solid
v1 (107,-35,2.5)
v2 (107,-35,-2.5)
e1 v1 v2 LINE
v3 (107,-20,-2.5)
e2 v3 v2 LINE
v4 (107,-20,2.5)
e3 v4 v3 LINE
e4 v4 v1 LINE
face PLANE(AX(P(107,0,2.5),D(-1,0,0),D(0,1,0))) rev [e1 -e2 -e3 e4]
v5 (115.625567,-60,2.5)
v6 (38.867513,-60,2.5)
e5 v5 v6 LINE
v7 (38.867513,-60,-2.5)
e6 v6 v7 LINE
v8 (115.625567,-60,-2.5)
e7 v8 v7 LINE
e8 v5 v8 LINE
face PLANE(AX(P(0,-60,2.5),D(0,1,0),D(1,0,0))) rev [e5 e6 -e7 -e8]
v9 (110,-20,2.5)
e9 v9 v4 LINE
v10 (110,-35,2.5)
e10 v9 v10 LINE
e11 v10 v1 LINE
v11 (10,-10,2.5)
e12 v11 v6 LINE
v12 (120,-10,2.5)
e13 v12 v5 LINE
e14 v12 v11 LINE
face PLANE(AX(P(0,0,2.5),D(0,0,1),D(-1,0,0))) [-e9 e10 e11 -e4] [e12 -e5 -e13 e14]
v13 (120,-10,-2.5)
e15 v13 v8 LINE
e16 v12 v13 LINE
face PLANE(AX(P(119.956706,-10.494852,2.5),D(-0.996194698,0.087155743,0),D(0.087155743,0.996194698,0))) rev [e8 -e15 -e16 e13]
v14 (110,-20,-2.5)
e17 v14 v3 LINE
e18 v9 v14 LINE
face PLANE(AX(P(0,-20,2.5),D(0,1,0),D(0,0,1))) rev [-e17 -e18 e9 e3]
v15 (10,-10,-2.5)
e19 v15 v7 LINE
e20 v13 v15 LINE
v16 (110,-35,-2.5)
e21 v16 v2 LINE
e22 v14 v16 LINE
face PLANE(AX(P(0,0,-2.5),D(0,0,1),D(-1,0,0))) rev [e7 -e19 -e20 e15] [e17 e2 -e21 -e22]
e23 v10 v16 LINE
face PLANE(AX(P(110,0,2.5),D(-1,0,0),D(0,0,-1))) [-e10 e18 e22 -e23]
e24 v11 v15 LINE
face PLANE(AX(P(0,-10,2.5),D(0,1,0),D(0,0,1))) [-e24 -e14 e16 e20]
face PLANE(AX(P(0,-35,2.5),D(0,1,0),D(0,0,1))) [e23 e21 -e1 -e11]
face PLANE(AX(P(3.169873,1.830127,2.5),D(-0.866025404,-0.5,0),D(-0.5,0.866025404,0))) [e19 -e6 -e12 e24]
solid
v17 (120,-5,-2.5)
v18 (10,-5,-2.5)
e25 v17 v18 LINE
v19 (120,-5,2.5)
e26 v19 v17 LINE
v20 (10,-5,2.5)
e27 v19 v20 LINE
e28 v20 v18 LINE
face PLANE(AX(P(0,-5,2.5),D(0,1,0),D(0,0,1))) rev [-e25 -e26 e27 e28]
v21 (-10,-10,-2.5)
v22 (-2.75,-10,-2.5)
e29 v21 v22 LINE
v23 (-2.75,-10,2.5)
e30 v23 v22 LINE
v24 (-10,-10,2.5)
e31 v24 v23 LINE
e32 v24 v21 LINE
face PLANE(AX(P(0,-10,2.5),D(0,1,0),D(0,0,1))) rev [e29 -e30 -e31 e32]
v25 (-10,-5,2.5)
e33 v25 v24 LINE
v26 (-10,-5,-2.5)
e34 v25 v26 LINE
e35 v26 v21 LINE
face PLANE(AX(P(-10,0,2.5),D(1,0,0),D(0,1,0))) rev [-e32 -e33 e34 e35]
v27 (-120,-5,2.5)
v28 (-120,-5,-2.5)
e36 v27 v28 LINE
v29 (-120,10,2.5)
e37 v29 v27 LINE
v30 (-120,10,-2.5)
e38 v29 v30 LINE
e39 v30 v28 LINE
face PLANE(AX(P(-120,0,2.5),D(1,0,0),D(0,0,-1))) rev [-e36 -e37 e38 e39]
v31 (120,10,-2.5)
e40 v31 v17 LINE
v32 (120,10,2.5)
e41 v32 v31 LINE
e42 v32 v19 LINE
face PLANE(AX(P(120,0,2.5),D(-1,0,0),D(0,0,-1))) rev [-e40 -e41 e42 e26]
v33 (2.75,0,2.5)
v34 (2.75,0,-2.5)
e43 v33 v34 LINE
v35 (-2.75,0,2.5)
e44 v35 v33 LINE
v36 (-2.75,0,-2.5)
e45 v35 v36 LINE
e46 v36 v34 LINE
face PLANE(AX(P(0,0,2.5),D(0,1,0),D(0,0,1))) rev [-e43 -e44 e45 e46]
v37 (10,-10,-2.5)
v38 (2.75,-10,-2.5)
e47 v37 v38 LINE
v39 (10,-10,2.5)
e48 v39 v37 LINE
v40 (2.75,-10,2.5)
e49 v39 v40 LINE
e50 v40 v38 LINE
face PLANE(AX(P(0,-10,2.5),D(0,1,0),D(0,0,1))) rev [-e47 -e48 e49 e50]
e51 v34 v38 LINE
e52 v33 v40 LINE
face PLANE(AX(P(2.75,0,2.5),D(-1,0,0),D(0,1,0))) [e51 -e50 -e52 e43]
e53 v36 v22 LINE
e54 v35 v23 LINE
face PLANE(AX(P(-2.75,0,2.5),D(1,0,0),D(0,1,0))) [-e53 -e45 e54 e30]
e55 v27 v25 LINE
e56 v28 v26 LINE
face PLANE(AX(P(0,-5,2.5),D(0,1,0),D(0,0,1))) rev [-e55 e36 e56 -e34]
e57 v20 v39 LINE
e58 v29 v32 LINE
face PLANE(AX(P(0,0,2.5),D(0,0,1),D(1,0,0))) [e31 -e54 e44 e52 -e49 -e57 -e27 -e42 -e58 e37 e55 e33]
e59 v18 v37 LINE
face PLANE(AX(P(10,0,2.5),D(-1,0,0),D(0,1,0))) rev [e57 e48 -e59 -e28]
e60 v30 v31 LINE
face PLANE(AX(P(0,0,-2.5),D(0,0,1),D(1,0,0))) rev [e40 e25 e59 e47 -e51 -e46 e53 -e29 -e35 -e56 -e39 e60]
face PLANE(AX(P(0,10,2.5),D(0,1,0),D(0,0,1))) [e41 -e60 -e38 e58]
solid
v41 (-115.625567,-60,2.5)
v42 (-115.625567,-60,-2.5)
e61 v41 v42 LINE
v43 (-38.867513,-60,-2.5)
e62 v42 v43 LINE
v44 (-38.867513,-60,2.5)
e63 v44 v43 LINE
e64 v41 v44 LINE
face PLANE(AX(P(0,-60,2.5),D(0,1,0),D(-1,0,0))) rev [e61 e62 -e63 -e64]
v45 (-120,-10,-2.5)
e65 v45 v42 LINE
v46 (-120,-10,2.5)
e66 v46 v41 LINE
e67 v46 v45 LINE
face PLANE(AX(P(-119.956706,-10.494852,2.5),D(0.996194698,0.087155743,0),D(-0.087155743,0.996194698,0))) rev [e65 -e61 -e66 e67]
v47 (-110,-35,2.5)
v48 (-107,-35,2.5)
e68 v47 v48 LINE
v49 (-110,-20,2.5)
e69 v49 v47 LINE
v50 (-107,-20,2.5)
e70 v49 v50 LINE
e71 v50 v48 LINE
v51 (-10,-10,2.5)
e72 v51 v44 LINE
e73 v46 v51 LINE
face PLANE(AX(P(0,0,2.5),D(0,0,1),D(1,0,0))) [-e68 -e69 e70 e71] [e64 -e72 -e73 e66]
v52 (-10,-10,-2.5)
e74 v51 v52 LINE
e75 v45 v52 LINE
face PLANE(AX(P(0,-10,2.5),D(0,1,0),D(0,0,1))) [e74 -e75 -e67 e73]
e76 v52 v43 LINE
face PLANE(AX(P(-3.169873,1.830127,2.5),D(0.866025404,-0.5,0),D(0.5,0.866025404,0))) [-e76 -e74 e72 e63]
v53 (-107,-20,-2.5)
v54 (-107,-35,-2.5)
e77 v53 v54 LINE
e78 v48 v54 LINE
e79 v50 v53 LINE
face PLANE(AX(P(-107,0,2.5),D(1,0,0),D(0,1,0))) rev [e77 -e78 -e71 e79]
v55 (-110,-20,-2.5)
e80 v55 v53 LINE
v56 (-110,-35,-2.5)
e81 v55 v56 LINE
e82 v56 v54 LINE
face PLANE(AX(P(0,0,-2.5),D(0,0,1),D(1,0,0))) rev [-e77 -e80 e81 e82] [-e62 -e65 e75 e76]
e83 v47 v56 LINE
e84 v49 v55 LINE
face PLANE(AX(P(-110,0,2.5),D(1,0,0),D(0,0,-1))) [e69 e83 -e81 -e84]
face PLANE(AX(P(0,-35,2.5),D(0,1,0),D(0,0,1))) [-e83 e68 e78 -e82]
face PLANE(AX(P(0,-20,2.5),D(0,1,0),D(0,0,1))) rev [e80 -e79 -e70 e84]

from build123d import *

# Parameters (mm, degrees)
SKETCH1_W             = 3
SKETCH1_H             = 15
BOSS_EXTRUDE2_DEPTH   = 2.5
BOSS_EXTRUDE2_2_DEPTH = 2.5
MIRROR1_START         = -5
MIRROR1_OUTLINE_W     = 117.25
MIRROR1_OUTLINE_H     = 5
MIRROR1_DEPTH         = 15
MIRROR1_START_2       = -10
MIRROR1_2_OUTLINE_W   = 7.25
MIRROR1_2_OUTLINE_H   = 5
MIRROR1_2_DEPTH       = 5
MIRROR1_3_OUTLINE_W   = 2.75
MIRROR1_3_OUTLINE_H   = 5
MIRROR1_3_DEPTH       = 10


# Read off the part's stored shape, not the designer's step: Mirror1
with BuildPart() as part:
    # Sketch1 → Boss-Extrude2 (new, symmetric)
    with BuildSketch(Plane.XY):
        Polygon((-10, -10), (-120, -10), (-115.625566824, -60), (-38.867513459, -60), align=None)
        with Locations((-108.5, -27.5)):
            Rectangle(SKETCH1_W, SKETCH1_H, mode=Mode.SUBTRACT)
    extrude(amount=BOSS_EXTRUDE2_DEPTH, both=True)


with BuildPart() as body_2:
    # Sketch1 → Boss-Extrude2 2 (new, symmetric)
    with BuildSketch(Plane.XY):
        Polygon((-120, 10), (-120, -5), (-10, -5), (-10, -10), (-2.75, -10), (-2.75, 0), (0, 0), (0, 10), align=None)
    extrude(amount=BOSS_EXTRUDE2_2_DEPTH, both=True)



with BuildPart() as body_3:
    # Mirror1 outline → Mirror1 (new body)
    with BuildSketch(Plane(origin=(0, 0, 0), x_dir=(1, 0, 0), z_dir=(0, 1, 0)).offset(MIRROR1_START)):
        with Locations((61.375, 0)):
            Rectangle(MIRROR1_OUTLINE_W, MIRROR1_OUTLINE_H)
    extrude(amount=MIRROR1_DEPTH)

    # Mirror1 2 outline → Mirror1 2 (add)
    with BuildSketch(Plane(origin=(0, 0, 0), x_dir=(1, 0, 0), z_dir=(0, 1, 0)).offset(MIRROR1_START_2)):
        with Locations((6.375, 0)):
            Rectangle(MIRROR1_2_OUTLINE_W, MIRROR1_2_OUTLINE_H)
    extrude(amount=MIRROR1_2_DEPTH)


with BuildPart() as body_2_1:
    add(body_2.part)

    add(body_3.part)  # Mirror1 3 merges body 3
    # Mirror1 3 outline → Mirror1 3 (add)
    with BuildSketch(Plane(origin=(0, 0, 0), x_dir=(1, 0, 0), z_dir=(0, 1, 0))):
        with Locations((1.375, 0)):
            Rectangle(MIRROR1_3_OUTLINE_W, MIRROR1_3_OUTLINE_H)
    extrude(amount=MIRROR1_3_DEPTH)


with BuildPart() as body_3_2:
    # Mirror2: mirrored copy
    add(part.part.mirror(Plane(origin=(0, 0, 0), x_dir=(0, 0, 1), z_dir=(1, 0, 0))))


solid = Compound([part.part, body_2_1.part, body_3_2.part])
